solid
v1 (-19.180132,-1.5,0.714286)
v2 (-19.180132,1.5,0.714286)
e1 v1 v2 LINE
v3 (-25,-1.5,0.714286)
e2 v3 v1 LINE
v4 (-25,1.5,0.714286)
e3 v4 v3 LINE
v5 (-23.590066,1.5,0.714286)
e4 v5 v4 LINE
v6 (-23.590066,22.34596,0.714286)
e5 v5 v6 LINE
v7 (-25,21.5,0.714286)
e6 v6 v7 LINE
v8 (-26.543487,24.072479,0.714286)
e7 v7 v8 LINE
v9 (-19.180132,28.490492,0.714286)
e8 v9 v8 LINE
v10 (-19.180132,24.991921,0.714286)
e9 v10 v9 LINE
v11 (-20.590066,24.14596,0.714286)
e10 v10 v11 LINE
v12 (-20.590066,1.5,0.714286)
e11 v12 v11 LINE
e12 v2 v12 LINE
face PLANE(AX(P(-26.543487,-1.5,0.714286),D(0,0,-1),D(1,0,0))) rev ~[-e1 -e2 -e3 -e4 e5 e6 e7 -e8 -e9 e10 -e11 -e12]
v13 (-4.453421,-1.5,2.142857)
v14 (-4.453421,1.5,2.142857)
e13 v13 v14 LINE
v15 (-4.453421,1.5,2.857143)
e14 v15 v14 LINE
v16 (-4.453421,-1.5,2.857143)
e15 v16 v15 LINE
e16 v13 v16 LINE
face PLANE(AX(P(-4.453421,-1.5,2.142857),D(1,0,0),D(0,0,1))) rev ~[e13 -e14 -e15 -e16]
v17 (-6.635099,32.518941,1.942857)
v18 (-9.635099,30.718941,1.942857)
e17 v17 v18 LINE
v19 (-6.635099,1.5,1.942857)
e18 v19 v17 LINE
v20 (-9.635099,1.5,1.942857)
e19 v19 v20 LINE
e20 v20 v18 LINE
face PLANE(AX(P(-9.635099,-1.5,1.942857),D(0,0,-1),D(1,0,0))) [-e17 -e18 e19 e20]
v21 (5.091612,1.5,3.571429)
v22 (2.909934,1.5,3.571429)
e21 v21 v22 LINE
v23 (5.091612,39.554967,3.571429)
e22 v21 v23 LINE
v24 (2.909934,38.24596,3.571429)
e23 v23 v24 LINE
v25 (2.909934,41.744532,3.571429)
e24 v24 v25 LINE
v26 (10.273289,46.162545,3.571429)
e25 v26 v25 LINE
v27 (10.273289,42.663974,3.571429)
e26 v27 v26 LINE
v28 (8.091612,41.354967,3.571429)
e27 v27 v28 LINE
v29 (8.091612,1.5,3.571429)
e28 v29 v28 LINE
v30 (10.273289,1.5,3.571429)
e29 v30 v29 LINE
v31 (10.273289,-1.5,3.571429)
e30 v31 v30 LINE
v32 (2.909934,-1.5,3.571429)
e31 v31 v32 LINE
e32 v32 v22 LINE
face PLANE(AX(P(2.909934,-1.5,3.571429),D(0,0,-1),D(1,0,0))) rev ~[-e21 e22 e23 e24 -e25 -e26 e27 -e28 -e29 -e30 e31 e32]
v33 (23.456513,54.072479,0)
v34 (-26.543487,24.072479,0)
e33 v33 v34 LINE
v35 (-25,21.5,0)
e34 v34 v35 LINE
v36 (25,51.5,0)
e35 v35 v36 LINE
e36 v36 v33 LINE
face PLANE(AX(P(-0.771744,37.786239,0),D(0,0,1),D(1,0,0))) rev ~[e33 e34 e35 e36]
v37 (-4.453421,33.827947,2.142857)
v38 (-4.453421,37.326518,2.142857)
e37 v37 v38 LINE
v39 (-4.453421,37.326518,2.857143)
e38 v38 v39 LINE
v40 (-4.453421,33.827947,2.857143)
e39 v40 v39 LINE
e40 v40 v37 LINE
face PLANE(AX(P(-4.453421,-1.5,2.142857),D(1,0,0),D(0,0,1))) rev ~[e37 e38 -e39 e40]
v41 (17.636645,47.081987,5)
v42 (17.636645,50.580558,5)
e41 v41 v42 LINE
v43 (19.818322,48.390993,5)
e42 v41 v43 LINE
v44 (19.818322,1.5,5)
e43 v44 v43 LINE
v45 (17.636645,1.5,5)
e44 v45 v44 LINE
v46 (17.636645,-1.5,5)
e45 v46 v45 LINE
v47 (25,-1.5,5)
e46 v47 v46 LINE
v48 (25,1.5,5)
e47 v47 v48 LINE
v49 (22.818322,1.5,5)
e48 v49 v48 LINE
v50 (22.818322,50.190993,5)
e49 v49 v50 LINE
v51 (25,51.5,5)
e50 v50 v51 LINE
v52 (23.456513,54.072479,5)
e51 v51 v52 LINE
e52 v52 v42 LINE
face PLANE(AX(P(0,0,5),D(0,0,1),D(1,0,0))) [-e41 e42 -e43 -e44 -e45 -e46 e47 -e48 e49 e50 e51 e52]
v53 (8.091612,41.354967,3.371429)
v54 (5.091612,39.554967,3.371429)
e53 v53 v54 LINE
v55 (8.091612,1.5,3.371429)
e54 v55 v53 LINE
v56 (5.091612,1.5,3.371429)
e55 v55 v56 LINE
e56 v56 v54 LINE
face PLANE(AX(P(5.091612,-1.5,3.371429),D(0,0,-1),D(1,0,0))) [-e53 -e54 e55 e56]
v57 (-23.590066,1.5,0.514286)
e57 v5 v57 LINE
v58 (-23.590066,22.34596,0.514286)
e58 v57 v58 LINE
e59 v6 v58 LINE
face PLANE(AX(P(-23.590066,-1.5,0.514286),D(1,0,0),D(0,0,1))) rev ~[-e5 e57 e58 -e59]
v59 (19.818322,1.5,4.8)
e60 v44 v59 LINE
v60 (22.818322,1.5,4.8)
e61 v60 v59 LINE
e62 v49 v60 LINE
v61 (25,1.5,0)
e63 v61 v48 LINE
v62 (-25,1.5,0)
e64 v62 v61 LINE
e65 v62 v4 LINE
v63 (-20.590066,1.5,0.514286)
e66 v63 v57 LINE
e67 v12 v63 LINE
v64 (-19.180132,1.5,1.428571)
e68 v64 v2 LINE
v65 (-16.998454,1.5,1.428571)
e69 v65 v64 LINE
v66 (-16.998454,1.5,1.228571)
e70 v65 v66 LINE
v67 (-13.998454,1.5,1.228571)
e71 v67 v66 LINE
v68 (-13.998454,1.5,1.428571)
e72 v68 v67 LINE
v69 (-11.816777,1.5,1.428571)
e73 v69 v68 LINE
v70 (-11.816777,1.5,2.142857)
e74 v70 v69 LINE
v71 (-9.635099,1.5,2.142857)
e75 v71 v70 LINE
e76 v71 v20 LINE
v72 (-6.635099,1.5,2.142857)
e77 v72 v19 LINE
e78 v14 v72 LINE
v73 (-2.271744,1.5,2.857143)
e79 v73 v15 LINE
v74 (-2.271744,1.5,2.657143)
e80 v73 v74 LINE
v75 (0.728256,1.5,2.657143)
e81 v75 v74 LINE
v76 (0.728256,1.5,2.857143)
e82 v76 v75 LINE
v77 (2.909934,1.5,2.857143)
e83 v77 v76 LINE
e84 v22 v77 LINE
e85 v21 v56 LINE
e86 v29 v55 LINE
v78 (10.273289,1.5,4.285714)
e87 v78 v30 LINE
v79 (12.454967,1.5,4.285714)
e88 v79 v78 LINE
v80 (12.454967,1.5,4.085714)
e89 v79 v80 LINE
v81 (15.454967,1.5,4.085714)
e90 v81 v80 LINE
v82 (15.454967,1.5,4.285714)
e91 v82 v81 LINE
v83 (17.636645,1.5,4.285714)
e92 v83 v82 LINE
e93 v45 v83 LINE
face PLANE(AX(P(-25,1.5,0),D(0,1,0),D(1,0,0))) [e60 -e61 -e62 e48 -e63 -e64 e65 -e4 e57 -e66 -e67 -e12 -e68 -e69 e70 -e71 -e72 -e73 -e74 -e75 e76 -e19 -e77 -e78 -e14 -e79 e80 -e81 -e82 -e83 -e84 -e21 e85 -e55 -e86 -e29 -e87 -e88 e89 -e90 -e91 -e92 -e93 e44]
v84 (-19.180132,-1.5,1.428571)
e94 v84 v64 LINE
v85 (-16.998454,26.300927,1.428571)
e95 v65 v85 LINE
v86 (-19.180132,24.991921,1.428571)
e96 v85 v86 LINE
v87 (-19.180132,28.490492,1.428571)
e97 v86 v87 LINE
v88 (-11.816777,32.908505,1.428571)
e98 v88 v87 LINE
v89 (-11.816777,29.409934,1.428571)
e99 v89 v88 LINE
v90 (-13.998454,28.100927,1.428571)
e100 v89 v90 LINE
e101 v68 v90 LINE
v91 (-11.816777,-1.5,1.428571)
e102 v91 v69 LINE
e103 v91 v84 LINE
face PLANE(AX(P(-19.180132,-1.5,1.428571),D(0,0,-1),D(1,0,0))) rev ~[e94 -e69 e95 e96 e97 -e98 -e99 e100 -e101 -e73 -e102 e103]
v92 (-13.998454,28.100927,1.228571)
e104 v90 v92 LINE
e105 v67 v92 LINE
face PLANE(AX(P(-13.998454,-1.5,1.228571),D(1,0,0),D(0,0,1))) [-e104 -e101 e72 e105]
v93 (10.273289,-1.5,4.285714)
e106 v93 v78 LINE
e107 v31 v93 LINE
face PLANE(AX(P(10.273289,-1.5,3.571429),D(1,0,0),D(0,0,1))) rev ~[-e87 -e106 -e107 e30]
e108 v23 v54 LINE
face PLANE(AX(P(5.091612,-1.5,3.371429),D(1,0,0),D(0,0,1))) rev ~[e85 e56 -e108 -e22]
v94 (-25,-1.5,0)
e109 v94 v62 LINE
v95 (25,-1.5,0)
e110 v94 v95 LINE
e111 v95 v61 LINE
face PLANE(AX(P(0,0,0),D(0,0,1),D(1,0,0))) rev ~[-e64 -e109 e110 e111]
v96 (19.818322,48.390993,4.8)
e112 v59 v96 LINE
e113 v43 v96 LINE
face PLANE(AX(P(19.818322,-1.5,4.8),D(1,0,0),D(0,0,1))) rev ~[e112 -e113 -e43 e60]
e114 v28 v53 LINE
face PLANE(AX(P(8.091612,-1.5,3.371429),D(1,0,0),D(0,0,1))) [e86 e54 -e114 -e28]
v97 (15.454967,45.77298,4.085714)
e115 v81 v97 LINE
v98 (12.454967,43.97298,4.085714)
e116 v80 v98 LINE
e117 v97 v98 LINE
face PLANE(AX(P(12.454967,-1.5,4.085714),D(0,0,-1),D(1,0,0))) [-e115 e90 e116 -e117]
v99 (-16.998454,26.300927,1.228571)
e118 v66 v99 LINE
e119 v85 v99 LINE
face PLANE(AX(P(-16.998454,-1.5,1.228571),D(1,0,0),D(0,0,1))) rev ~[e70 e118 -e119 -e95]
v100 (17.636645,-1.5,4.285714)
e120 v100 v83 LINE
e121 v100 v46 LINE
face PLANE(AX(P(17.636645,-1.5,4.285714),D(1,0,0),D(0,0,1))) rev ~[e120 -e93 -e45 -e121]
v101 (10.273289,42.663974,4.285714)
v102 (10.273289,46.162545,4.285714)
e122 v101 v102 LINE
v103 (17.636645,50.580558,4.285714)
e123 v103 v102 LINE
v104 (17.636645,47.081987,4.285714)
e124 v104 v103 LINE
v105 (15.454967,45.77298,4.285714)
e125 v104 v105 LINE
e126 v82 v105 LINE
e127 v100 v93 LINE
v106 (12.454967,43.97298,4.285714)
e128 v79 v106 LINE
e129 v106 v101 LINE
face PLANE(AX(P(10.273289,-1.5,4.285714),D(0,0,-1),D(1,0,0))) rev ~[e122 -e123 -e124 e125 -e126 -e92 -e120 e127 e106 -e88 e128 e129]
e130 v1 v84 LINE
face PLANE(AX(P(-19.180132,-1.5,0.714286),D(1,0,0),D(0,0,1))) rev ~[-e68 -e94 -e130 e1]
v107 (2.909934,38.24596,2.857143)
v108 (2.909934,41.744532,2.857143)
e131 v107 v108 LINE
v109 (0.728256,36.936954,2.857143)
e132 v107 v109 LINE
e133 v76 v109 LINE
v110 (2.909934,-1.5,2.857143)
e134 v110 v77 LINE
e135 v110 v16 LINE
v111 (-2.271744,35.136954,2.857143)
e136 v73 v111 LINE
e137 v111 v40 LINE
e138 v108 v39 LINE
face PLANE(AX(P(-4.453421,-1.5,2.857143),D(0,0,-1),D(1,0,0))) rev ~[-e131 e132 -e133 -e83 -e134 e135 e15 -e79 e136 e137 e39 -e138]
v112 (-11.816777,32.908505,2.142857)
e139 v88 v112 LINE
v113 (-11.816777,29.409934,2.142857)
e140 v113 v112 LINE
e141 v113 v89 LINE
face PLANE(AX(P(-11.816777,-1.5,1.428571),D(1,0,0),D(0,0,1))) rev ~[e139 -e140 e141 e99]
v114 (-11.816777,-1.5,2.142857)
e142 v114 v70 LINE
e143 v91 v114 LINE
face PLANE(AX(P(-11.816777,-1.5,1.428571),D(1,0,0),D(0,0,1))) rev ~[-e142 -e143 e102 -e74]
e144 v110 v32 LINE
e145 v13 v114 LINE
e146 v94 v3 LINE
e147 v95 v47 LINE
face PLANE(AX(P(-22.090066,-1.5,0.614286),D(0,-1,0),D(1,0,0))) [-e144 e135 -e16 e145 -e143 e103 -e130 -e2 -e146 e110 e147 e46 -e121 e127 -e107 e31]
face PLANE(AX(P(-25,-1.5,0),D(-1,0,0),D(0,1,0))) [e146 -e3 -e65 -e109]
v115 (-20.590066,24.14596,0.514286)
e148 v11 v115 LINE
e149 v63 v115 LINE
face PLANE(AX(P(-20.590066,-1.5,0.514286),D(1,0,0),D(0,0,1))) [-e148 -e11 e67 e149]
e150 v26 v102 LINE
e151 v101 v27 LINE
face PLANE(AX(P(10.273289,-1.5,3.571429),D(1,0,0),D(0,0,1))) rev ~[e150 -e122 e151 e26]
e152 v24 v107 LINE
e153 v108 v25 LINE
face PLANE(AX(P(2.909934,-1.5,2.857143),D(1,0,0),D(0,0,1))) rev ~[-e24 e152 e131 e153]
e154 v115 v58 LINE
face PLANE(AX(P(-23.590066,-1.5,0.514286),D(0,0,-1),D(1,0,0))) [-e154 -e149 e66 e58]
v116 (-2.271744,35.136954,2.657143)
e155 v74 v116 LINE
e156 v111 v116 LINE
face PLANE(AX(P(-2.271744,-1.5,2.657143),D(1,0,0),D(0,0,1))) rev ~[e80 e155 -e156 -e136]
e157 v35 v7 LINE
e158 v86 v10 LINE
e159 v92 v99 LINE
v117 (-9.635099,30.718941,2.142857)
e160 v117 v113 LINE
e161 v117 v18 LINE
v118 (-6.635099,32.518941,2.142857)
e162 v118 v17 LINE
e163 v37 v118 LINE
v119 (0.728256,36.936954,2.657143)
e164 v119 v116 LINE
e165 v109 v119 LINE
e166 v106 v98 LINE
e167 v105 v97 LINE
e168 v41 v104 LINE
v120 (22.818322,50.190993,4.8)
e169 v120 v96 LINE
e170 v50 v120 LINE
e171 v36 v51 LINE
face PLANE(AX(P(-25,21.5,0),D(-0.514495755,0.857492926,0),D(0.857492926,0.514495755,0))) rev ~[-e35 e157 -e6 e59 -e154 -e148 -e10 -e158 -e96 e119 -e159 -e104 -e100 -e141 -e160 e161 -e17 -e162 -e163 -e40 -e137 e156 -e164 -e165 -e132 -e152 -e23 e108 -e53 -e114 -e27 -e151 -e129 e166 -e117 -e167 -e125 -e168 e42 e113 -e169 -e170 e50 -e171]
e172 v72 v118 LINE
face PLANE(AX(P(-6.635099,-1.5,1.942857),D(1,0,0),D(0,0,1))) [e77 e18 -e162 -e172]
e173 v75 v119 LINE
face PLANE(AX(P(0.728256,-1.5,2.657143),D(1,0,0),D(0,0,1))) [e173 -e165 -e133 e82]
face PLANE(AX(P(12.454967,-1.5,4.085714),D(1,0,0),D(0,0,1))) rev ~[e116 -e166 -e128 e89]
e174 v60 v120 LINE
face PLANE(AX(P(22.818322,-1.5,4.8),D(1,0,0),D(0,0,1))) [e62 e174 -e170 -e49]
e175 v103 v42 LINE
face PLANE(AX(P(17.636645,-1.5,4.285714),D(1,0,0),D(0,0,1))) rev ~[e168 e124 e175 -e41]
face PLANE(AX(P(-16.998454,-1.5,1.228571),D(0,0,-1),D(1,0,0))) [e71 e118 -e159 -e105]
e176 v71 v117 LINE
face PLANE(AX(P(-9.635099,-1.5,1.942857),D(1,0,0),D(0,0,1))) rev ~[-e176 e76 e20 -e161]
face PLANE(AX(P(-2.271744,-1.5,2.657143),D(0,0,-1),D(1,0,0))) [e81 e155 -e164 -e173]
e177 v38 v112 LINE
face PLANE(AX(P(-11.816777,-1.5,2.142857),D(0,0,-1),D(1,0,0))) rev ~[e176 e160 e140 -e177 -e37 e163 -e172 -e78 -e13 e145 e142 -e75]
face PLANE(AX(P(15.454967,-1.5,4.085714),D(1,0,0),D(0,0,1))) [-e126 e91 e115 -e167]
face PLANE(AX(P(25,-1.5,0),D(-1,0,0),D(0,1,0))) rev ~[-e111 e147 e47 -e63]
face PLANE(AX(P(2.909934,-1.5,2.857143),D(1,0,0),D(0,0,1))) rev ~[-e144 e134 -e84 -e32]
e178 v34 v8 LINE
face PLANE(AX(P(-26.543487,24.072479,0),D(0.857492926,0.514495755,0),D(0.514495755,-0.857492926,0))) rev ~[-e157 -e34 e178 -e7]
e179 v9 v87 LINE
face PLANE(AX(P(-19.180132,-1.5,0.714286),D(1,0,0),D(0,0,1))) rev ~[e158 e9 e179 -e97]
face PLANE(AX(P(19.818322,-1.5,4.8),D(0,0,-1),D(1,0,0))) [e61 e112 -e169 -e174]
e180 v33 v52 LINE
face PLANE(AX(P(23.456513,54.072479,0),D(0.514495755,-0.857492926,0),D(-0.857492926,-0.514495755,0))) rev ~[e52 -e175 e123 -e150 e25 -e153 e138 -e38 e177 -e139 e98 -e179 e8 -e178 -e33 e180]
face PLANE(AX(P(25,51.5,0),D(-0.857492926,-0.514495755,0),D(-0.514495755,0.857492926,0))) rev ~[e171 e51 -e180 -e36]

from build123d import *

# Parameters (mm, degrees)
F0_W     = 50
F0_H     = 3
F1_DEPTH = 5
F3_DEPTH = 55.5734787771
F4_W     = 3
F4_H     = 0.2
F5_REACH = 58.5801380528


with BuildPart() as f1:
    # F0 (on Top) → F1 (new body)
    with BuildSketch(Plane.XY):
        Rectangle(F0_W, F0_H)
    extrude(amount=F1_DEPTH)


with BuildPart() as f1b:
    # F0 (on Top) → F1, piece 2 (new body)
    with BuildSketch(Plane.XY):
        Polygon((-26.5434872663, 24.0724787771), (-25, 21.5), (25, 51.5), (23.4565127337, 54.0724787771), align=None)
    extrude(amount=F1_DEPTH)


with BuildPart() as f3_tool:
    # F2 (on face) → F3 (new body, through all)
    with BuildSketch(Plane.XZ.offset(1.5)):
        Polygon((17.6366446762, 5), (-26.5434872663, 5), (-26.5434872663, 0.7142857143), (-19.1801319425, 0.7142857143), (-19.1801319425, 1.4285714286), (-11.8167766188, 1.4285714286), (-11.8167766188, 2.1428571429), (-4.453421295, 2.1428571429), (-4.453421295, 2.8571428571), (2.9099340287, 2.8571428571), (2.9099340287, 3.5714285714), (10.2732893525, 3.5714285714), (10.2732893525, 4.2857142857), (17.6366446762, 4.2857142857), align=None)
    extrude(amount=-F3_DEPTH)


with BuildPart() as f1_1:
    add(f1.part)

    # F3: cut by f3_tool
    add(f3_tool.part, mode=Mode.SUBTRACT)



with BuildPart() as f1b_1:
    add(f1b.part)

    # F3: cut by f3_tool
    add(f3_tool.part, mode=Mode.SUBTRACT)


with BuildPart() as f1_2:
    add(f1_1.part)

    add(f1b_1.part)  # F5 merges F1b
    f5_end = f1_2.faces().sort_by_distance((5.616262324, 43.3683285313, 1.7462125476))[0]
    # F4 (on face) → F5 (join, up to a face of the model that its end follows)
    with BuildSketch(Plane.XZ.offset(1.5)):
        with Locations((-22.0900659713, 0.6142857143)):
            Rectangle(F4_W, F4_H)
        with Locations((-15.4984542807, 1.3285714286)):
            Rectangle(F4_W, F4_H)
        with Locations((-8.1350989569, 2.0428571429)):
            Rectangle(F4_W, F4_H)
        with Locations((-0.7717436331, 2.7571428571)):
            Rectangle(F4_W, F4_H)
        with Locations((6.5916116906, 3.4714285714)):
            Rectangle(F4_W, F4_H)
        with Locations((13.9549670144, 4.1857142857)):
            Rectangle(F4_W, F4_H)
        with Locations((21.3183223381, 4.9)):
            Rectangle(F4_W, F4_H)
    f5_long = extrude(amount=-F5_REACH, mode=Mode.PRIVATE)
    add(split(f5_long, bisect_by=f5_end, keep=Keep.BOTTOM, mode=Mode.PRIVATE))


solid = f1_2.part
